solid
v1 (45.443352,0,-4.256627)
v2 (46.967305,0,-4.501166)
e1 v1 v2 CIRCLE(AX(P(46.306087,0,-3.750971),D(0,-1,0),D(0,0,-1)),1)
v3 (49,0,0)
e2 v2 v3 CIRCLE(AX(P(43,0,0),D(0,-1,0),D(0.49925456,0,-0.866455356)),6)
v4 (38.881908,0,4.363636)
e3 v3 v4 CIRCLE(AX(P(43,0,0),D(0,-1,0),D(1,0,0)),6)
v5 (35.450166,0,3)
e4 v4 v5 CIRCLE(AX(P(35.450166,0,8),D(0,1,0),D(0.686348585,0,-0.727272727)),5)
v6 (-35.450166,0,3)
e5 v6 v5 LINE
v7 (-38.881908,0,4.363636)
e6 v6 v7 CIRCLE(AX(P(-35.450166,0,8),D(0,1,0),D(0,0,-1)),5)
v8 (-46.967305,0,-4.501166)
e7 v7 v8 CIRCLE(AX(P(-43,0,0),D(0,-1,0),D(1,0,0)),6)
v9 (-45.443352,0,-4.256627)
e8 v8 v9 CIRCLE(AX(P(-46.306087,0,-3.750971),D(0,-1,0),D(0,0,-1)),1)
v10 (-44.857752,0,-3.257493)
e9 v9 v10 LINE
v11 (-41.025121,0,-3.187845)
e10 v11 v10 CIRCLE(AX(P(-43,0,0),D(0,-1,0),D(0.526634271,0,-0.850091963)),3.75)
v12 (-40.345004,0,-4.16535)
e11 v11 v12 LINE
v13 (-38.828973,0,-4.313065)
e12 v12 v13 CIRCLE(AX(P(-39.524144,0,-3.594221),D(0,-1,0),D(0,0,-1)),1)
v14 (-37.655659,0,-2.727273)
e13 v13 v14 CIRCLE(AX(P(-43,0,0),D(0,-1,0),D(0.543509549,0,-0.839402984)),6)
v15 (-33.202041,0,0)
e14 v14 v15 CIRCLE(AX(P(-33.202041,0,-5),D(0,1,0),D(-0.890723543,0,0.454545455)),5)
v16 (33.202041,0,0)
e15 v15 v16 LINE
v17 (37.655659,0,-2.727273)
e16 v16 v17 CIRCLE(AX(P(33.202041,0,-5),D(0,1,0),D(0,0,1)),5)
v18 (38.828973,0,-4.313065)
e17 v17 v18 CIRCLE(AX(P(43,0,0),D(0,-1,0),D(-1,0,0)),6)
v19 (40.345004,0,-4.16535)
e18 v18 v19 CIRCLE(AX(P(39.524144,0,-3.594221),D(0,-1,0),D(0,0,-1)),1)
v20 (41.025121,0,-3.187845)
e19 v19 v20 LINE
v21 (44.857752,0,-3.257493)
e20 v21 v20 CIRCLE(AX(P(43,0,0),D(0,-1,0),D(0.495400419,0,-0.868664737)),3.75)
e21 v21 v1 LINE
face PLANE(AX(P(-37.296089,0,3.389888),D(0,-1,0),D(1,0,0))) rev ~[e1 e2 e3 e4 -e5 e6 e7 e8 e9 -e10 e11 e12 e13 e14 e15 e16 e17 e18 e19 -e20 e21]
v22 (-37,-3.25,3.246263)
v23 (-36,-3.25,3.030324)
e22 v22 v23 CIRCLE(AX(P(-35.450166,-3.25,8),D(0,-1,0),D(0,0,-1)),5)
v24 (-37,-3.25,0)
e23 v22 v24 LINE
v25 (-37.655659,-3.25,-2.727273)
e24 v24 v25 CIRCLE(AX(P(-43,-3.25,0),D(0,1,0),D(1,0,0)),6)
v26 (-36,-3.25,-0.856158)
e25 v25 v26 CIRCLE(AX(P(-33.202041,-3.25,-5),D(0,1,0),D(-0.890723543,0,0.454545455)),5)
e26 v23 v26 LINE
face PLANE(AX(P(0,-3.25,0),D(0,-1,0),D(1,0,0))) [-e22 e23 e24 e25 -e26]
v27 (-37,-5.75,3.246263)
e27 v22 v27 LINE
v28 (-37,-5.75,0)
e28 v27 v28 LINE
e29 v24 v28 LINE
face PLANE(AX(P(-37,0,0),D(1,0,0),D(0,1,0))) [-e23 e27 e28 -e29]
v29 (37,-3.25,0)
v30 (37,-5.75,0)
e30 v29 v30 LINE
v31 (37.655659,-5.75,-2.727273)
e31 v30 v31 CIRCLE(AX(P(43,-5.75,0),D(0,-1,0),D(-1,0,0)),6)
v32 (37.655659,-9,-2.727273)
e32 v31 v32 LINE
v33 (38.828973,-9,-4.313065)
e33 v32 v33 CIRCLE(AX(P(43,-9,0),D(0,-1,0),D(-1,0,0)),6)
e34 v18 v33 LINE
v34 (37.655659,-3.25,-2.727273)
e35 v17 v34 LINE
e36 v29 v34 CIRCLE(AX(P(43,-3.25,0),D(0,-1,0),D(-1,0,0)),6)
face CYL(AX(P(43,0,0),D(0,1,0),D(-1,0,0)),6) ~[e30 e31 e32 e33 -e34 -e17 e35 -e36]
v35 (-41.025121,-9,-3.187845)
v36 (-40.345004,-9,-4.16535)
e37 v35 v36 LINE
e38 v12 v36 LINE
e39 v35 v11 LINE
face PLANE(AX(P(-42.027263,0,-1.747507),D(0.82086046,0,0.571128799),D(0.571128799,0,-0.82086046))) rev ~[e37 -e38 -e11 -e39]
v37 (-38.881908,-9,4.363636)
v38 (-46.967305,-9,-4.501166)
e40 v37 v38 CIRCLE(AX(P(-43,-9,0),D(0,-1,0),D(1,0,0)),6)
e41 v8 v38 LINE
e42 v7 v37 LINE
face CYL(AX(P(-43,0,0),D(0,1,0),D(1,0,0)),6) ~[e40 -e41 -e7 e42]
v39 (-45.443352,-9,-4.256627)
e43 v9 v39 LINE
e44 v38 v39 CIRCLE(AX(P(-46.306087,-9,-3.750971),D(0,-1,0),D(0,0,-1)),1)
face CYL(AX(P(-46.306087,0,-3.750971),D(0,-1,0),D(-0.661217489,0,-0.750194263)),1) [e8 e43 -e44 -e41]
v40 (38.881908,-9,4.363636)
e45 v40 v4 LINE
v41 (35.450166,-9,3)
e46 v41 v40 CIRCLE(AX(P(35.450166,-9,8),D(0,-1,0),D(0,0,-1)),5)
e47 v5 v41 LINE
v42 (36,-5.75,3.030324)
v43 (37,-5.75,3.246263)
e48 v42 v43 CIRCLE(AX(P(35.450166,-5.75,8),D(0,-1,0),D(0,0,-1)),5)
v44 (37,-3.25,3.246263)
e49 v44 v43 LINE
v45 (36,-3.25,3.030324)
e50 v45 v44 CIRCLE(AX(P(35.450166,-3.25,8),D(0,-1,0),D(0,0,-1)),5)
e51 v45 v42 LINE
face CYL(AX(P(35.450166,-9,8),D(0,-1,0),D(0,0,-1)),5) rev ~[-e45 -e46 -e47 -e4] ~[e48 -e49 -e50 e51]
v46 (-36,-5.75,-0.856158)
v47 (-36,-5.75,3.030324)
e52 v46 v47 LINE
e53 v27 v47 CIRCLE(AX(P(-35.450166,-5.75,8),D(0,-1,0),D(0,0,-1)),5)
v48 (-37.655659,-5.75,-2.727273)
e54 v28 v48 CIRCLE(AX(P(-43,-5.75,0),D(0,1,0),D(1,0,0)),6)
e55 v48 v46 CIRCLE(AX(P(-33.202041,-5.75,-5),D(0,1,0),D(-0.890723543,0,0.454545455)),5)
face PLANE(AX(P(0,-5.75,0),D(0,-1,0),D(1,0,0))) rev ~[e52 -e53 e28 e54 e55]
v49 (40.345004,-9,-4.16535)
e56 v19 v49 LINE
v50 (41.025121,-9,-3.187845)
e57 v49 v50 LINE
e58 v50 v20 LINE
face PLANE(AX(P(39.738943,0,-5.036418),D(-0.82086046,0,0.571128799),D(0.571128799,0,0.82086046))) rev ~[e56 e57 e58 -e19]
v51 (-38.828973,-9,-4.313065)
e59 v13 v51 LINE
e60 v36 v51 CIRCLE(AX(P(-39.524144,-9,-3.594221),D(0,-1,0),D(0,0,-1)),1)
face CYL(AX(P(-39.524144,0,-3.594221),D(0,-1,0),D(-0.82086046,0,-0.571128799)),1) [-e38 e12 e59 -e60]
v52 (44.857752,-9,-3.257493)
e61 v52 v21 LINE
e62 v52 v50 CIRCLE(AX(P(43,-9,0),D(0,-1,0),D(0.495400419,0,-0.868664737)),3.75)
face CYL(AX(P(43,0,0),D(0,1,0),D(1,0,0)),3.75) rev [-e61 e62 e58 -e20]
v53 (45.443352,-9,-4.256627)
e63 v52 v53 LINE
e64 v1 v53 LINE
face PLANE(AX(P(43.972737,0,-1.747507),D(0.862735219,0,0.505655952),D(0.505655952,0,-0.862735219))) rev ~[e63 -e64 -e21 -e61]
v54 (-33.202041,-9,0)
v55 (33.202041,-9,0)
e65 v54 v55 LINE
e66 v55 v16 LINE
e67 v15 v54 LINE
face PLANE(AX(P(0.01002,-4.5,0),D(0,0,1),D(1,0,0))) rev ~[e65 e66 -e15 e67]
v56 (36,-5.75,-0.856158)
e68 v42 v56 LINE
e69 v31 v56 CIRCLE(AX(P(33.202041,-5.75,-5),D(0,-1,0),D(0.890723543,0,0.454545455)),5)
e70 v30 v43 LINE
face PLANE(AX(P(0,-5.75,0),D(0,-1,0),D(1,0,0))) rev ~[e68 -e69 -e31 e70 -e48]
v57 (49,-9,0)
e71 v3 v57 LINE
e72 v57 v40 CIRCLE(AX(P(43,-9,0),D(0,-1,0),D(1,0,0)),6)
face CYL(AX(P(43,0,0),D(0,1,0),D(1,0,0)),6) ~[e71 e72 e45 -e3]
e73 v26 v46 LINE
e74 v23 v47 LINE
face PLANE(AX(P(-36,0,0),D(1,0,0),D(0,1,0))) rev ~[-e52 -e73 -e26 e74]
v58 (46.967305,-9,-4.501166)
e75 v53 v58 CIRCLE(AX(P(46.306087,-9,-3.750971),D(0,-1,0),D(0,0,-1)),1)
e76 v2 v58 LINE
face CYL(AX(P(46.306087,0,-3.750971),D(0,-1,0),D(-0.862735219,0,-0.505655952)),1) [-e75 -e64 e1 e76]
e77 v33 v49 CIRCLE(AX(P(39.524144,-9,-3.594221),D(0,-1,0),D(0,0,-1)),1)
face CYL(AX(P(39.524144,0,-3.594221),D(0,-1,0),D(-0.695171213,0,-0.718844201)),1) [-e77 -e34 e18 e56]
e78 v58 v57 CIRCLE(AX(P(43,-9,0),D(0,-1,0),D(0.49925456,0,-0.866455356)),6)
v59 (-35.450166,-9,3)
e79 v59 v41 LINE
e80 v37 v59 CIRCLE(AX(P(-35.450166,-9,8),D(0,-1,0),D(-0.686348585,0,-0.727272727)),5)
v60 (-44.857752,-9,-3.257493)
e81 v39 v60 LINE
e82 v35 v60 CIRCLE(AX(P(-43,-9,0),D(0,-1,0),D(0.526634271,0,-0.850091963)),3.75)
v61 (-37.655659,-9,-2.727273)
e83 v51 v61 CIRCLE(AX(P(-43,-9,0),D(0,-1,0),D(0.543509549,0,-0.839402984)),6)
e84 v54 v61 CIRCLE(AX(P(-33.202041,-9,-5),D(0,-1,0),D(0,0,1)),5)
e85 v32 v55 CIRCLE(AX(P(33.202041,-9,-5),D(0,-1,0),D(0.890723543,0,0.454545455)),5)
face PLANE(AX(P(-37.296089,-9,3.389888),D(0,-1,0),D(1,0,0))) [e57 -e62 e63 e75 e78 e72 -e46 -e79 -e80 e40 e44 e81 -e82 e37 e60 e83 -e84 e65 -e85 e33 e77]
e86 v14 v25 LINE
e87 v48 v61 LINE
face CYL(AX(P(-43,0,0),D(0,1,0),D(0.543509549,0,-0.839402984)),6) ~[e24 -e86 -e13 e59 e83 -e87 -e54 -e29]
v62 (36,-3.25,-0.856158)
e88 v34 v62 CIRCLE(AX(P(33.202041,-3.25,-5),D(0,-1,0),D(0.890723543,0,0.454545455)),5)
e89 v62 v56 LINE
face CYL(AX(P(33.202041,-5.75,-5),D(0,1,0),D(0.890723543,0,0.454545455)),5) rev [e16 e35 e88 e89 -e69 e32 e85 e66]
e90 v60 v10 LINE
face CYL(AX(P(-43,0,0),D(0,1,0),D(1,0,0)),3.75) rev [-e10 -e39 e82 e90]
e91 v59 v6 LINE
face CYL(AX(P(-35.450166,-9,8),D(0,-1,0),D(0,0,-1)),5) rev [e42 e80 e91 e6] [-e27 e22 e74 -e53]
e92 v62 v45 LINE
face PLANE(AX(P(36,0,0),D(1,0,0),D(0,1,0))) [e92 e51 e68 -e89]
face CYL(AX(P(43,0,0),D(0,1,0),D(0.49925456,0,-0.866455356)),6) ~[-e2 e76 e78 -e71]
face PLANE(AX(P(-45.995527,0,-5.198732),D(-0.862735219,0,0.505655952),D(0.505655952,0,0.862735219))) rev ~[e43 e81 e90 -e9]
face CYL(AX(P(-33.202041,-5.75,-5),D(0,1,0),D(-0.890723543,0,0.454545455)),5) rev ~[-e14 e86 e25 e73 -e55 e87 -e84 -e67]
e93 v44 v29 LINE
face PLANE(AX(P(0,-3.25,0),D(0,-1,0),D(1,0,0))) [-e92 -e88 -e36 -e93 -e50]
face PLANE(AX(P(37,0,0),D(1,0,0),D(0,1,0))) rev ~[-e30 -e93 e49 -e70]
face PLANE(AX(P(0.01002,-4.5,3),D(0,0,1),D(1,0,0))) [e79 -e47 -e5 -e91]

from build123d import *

# Parameters (mm, degrees)
F1_DEPTH      = 9
F2_R          = 1
F2_2_R        = 1
F3_W          = 86
F3_H          = 9
F4_DEPTH      = 3
F7_R          = 2
F8_DEPTH      = 25
F9_W          = 1
F9_H          = 2.5
F10_DEPTH     = 25
F11_R         = 3.75
F12_DEPTH     = 25
F13_T1_DEPTH  = 3.25
F13_T3_DEPTH  = 3.25
F13_T8_DEPTH  = 14.8842050314
F13_T13_DEPTH = 9
F13_T18_DEPTH = 9
F13_T23_DEPTH = 14.8842050314
F13_T28_DEPTH = 14.8842050314
F13_T33_DEPTH = 9
F13_T38_DEPTH = 9
F13_T43_DEPTH = 14.8842050314
F13_T48_DEPTH = 22.2397948557
F13_T54_DEPTH = 12.7448974278
F13_T60_DEPTH = 22.2397948557
F13_T66_DEPTH = 12.7448974278
F13_T72_DEPTH = 22.2397948557
F13_T78_DEPTH = 12.7448974278
F13_T84_DEPTH = 22.2397948557
F13_T90_DEPTH = 12.7448974278


# Not quite as in the source:
# - a fillet or chamfer that OpenCascade refuses, or shapes differently, is made with other operations: its cross-section is extruded or revolved along the edge and cut away or added
# - a feature names something its author has since deleted; it is built from what else it names


with BuildPart() as f1:
    # F0 (on Front) → F1 (new body)
    with BuildSketch(Plane.XZ):
        with BuildLine():
            ThreePointArc((-43.9727372119, -1.7475074582), (-44.0135397319, 1.7241627568), (-41, 0))
            Line((-41, 0), (-37, 0))
            ThreePointArc((-37, 0), (-46.0022354873, 5.1948611222), (-45.9955273596, -5.1987321375))
            Line((-45.9955273596, -5.1987321375), (-43.9727372119, -1.7475074582))
        make_face()
        with BuildLine():
            Line((-37, 0), (-41, 0))
            ThreePointArc((-41, 0), (-41.2758372432, -1.0135397319), (-42.0272627881, -1.7475074582))
            Line((-42.0272627881, -1.7475074582), (-39.7389427056, -5.0364179059))
            ThreePointArc((-39.7389427056, -5.0364179059), (-37.7290255281, -2.8665010233), (-37, 0))
        make_face()
    extrude(amount=F1_DEPTH)

    # F2
    f2_edges = [f1.edges().sort_by_distance(p)[0] for p in [
        (-42.027263, -4.5, -1.747507),
        (-43.972737, -4.5, -1.747507),
        (-39.738943, -4.5, -5.036418),
        (-45.995527, -4.5, -5.198732),
    ]]
    fillet(f2_edges, radius=F2_R)



with BuildPart() as f1b:
    # F0 (on Front) → F1, piece 2 (new body)
    with BuildSketch(Plane.XZ):
        with BuildLine():
            Line((41, 0), (37, 0))
            ThreePointArc((37, 0), (37.7290255281, -2.8665010233), (39.7389427056, -5.0364179059))
            Line((39.7389427056, -5.0364179059), (42.0272627881, -1.7475074582))
            ThreePointArc((42.0272627881, -1.7475074582), (41.2758372432, -1.0135397319), (41, 0))
        make_face()
        with BuildLine():
            ThreePointArc((49, 0), (43, 6), (37, 0))
            Line((37, 0), (41, 0))
            ThreePointArc((41, 0), (43, 2), (45, 0))
            ThreePointArc((45, 0), (44.7241627568, -1.0135397319), (43.9727372119, -1.7475074582))
            Line((43.9727372119, -1.7475074582), (45.9955273596, -5.1987321375))
            ThreePointArc((45.9955273596, -5.1987321375), (48.1948611222, -3.0022354873), (49, 0))
        make_face()
    extrude(amount=F1_DEPTH)

    # F2#2
    f2_2_edges = [f1b.edges().sort_by_distance(p)[0] for p in [
        (42.027263, -4.5, -1.747507),
        (43.972737, -4.5, -1.747507),
        (39.738943, -4.5, -5.036418),
        (45.995527, -4.5, -5.198732),
    ]]
    fillet(f2_2_edges, radius=F2_2_R)


with BuildPart() as f1_1:
    add(f1.part)

    add(f1b.part)  # F4 merges F1b
    # F3 (on Top) → F4 (join)
    with BuildSketch(Plane.XY):
        with Locations((0.0100198983, -4.5)):
            Rectangle(F3_W, F3_H)
    extrude(amount=F4_DEPTH)

    # F5: union 

    # F6: union 

    # F7 (on Front) → F8 (cut)
    with BuildSketch(Plane.XZ):
        with Locations((-43.0078394711, 0)):
            Circle(F7_R)
        with Locations((42.9660789669, 0)):
            Circle(F7_R)
    extrude(amount=F8_DEPTH, mode=Mode.SUBTRACT)

    # F9 (on face) → F10 (cut)
    with BuildSketch(Plane(origin=(0, 0, 0), x_dir=(1, 0, 0), z_dir=(0, 0, -1))):
        with Locations((36.5, 4.5)):
            Rectangle(F9_W, F9_H)
        with Locations((-36.5, 4.5)):
            Rectangle(F9_W, F9_H)
    extrude(amount=-F10_DEPTH, mode=Mode.SUBTRACT)

    # F11 (on Front) → F12 (cut)
    with BuildSketch(Plane.XZ):
        with Locations((-43, 0)):
            Circle(F11_R)
        with Locations((43, 0)):
            Circle(F11_R)
    extrude(amount=F12_DEPTH, mode=Mode.SUBTRACT)

    # F13: fillet of radius 5 on 6 edges, made by hand

    # F13_s2 → F13_t1 (join)
    with BuildSketch(Plane.XZ.offset(5.75)):
        with BuildLine():
            ThreePointArc((-37.655658743, -2.7272727273), (-35.8132058682, -0.7359856729), (-33.2020410289, 0))
            Line((-33.2020410289, 0), (-37, 0))
            ThreePointArc((-37, 0), (-37.1662170274, -1.4024892973), (-37.655658743, -2.7272727273))
        make_face()
        with BuildLine():
            ThreePointArc((37.655658743, -2.7272727273), (35.8132058682, -0.7359856729), (33.2020410289, 0))
            Line((33.2020410289, 0), (37, 0))
            ThreePointArc((37, 0), (37.1662170274, -1.4024892973), (37.655658743, -2.7272727273))
        make_face()
    extrude(amount=F13_T1_DEPTH)

    # F13_s4 → F13_t3 (join)
    with BuildSketch(Plane.XZ):
        with BuildLine():
            ThreePointArc((37.655658743, -2.7272727273), (35.8132058682, -0.7359856729), (33.2020410289, 0))
            Line((33.2020410289, 0), (37, 0))
            ThreePointArc((37, 0), (37.1662170274, -1.4024892973), (37.655658743, -2.7272727273))
        make_face()
        with BuildLine():
            ThreePointArc((-37.655658743, -2.7272727273), (-35.8132058682, -0.7359856729), (-33.2020410289, 0))
            Line((-33.2020410289, 0), (-37, 0))
            ThreePointArc((-37, 0), (-37.1662170274, -1.4024892973), (-37.655658743, -2.7272727273))
        make_face()
    extrude(amount=F13_T3_DEPTH)


with BuildPart() as f13_tool6:
    # F13_s7 → F13_t8 (new body)
    with BuildSketch(Plane.XZ.offset(9)):
        with BuildLine():
            ThreePointArc((35.4501655647, 3), (37.2965379294, 3.3533981136), (38.8819084899, 4.3636363636))
            ThreePointArc((38.8819084899, 4.3636363636), (38.2932324209, 3.7210669111), (37.8038475773, 3))
            Line((37.8038475773, 3), (35.4501655647, 3))
        make_face()
    extrude(amount=-F13_T8_DEPTH)

    split(bisect_by=Plane.XZ.offset(5.75), keep=Keep.TOP)


with BuildPart() as f1_2:
    add(f1_1.part)

    # F13_t5: union F13_tool6
    add(f13_tool6.part)


with BuildPart() as f13_tool11:
    # F13_s12 → F13_t13 (new body)
    with BuildSketch(Plane.XZ.offset(9)):
        with BuildLine():
            ThreePointArc((35.4501655647, 3), (37.2965379294, 3.3533981136), (38.8819084899, 4.3636363636))
            ThreePointArc((38.8819084899, 4.3636363636), (38.2932324209, 3.7210669111), (37.8038475773, 3))
            Line((37.8038475773, 3), (35.4501655647, 3))
        make_face()
    extrude(amount=-F13_T13_DEPTH)

    split(bisect_by=Plane.YZ.offset(36), keep=Keep.BOTTOM)


with BuildPart() as f1_3:
    add(f1_2.part)

    # F13_t10: union F13_tool11
    add(f13_tool11.part)


with BuildPart() as f13_tool16:
    # F13_s17 → F13_t18 (new body)
    with BuildSketch(Plane.XZ.offset(9)):
        with BuildLine():
            ThreePointArc((35.4501655647, 3), (37.2965379294, 3.3533981136), (38.8819084899, 4.3636363636))
            ThreePointArc((38.8819084899, 4.3636363636), (38.2932324209, 3.7210669111), (37.8038475773, 3))
            Line((37.8038475773, 3), (35.4501655647, 3))
        make_face()
    extrude(amount=-F13_T18_DEPTH)

    split(bisect_by=Plane.YZ.offset(37), keep=Keep.TOP)


with BuildPart() as f1_4:
    add(f1_3.part)

    # F13_t15: union F13_tool16
    add(f13_tool16.part)


with BuildPart() as f13_tool21:
    # F13_s22 → F13_t23 (new body)
    with BuildSketch(Plane.XZ.offset(14.8842050314)):
        with BuildLine():
            ThreePointArc((35.4501655647, 3), (37.2965379294, 3.3533981136), (38.8819084899, 4.3636363636))
            ThreePointArc((38.8819084899, 4.3636363636), (38.2932324209, 3.7210669111), (37.8038475773, 3))
            Line((37.8038475773, 3), (35.4501655647, 3))
        make_face()
    extrude(amount=-F13_T23_DEPTH)

    split(bisect_by=Plane.XZ.offset(3.25), keep=Keep.BOTTOM)


with BuildPart() as f1_5:
    add(f1_4.part)

    # F13_t20: union F13_tool21
    add(f13_tool21.part)


with BuildPart() as f13_tool26:
    # F13_s27 → F13_t28 (new body)
    with BuildSketch(Plane.XZ.offset(9)):
        with BuildLine():
            ThreePointArc((-35.4501655647, 3), (-37.2965379294, 3.3533981136), (-38.8819084899, 4.3636363636))
            ThreePointArc((-38.8819084899, 4.3636363636), (-38.2932324209, 3.7210669111), (-37.8038475773, 3))
            Line((-37.8038475773, 3), (-35.4501655647, 3))
        make_face()
    extrude(amount=-F13_T28_DEPTH)

    split(bisect_by=Plane.XZ.offset(5.75), keep=Keep.TOP)


with BuildPart() as f1_6:
    add(f1_5.part)

    # F13_t25: union F13_tool26
    add(f13_tool26.part)


with BuildPart() as f13_tool31:
    # F13_s32 → F13_t33 (new body)
    with BuildSketch(Plane.XZ.offset(9)):
        with BuildLine():
            ThreePointArc((-35.4501655647, 3), (-37.2965379294, 3.3533981136), (-38.8819084899, 4.3636363636))
            ThreePointArc((-38.8819084899, 4.3636363636), (-38.2932324209, 3.7210669111), (-37.8038475773, 3))
            Line((-37.8038475773, 3), (-35.4501655647, 3))
        make_face()
    extrude(amount=-F13_T33_DEPTH)

    split(bisect_by=Plane.YZ.offset(-36), keep=Keep.TOP)


with BuildPart() as f1_7:
    add(f1_6.part)

    # F13_t30: union F13_tool31
    add(f13_tool31.part)


with BuildPart() as f13_tool36:
    # F13_s37 → F13_t38 (new body)
    with BuildSketch(Plane.XZ.offset(9)):
        with BuildLine():
            ThreePointArc((-35.4501655647, 3), (-37.2965379294, 3.3533981136), (-38.8819084899, 4.3636363636))
            ThreePointArc((-38.8819084899, 4.3636363636), (-38.2932324209, 3.7210669111), (-37.8038475773, 3))
            Line((-37.8038475773, 3), (-35.4501655647, 3))
        make_face()
    extrude(amount=-F13_T38_DEPTH)

    split(bisect_by=Plane.YZ.offset(-37), keep=Keep.BOTTOM)


with BuildPart() as f1_8:
    add(f1_7.part)

    # F13_t35: union F13_tool36
    add(f13_tool36.part)


with BuildPart() as f13_tool41:
    # F13_s42 → F13_t43 (new body)
    with BuildSketch(Plane.XZ.offset(14.8842050314)):
        with BuildLine():
            ThreePointArc((-35.4501655647, 3), (-37.2965379294, 3.3533981136), (-38.8819084899, 4.3636363636))
            ThreePointArc((-38.8819084899, 4.3636363636), (-38.2932324209, 3.7210669111), (-37.8038475773, 3))
            Line((-37.8038475773, 3), (-35.4501655647, 3))
        make_face()
    extrude(amount=-F13_T43_DEPTH)

    split(bisect_by=Plane.XZ.offset(3.25), keep=Keep.BOTTOM)


with BuildPart() as f1_9:
    add(f1_8.part)

    # F13_t40: union F13_tool41
    add(f13_tool41.part)


with BuildPart() as f13_tool46:
    # F13_s47 → F13_t48 (new body)
    with BuildSketch(Plane.XZ.offset(18.4948974278)):
        with BuildLine():
            ThreePointArc((-37.655658743, -2.7272727273), (-35.8132058682, -0.7359856729), (-33.2020410289, 0))
            Line((-33.2020410289, 0), (-37, 0))
            ThreePointArc((-37, 0), (-37.1662170274, -1.4024892973), (-37.655658743, -2.7272727273))
        make_face()
    extrude(amount=-F13_T48_DEPTH)

    split(bisect_by=Plane.XZ.offset(3.25), keep=Keep.BOTTOM)

    split(bisect_by=Plane.XZ, keep=Keep.TOP)


with BuildPart() as f1_10:
    add(f1_9.part)

    # F13_t45: union F13_tool46
    add(f13_tool46.part)


with BuildPart() as f13_tool52:
    # F13_s53 → F13_t54 (new body)
    with BuildSketch(Plane.XZ.offset(9)):
        with BuildLine():
            ThreePointArc((-37.655658743, -2.7272727273), (-35.8132058682, -0.7359856729), (-33.2020410289, 0))
            Line((-33.2020410289, 0), (-37, 0))
            ThreePointArc((-37, 0), (-37.1662170274, -1.4024892973), (-37.655658743, -2.7272727273))
        make_face()
    extrude(amount=-F13_T54_DEPTH)

    split(bisect_by=Plane.YZ.offset(-36), keep=Keep.TOP)

    split(bisect_by=Plane.XZ, keep=Keep.TOP)


with BuildPart() as f1_11:
    add(f1_10.part)

    # F13_t51: union F13_tool52
    add(f13_tool52.part)


with BuildPart() as f13_tool58:
    # F13_s59 → F13_t60 (new body)
    with BuildSketch(Plane.XZ.offset(18.4948974278)):
        with BuildLine():
            ThreePointArc((37.655658743, -2.7272727273), (35.8132058682, -0.7359856729), (33.2020410289, 0))
            Line((33.2020410289, 0), (37, 0))
            ThreePointArc((37, 0), (37.1662170274, -1.4024892973), (37.655658743, -2.7272727273))
        make_face()
    extrude(amount=-F13_T60_DEPTH)

    split(bisect_by=Plane.XZ.offset(3.25), keep=Keep.BOTTOM)

    split(bisect_by=Plane.XZ, keep=Keep.TOP)


with BuildPart() as f1_12:
    add(f1_11.part)

    # F13_t57: union F13_tool58
    add(f13_tool58.part)


with BuildPart() as f13_tool64:
    # F13_s65 → F13_t66 (new body)
    with BuildSketch(Plane.XZ.offset(9)):
        with BuildLine():
            ThreePointArc((37.655658743, -2.7272727273), (35.8132058682, -0.7359856729), (33.2020410289, 0))
            Line((33.2020410289, 0), (37, 0))
            ThreePointArc((37, 0), (37.1662170274, -1.4024892973), (37.655658743, -2.7272727273))
        make_face()
    extrude(amount=-F13_T66_DEPTH)

    split(bisect_by=Plane.YZ.offset(36), keep=Keep.BOTTOM)

    split(bisect_by=Plane.XZ, keep=Keep.TOP)


with BuildPart() as f1_13:
    add(f1_12.part)

    # F13_t63: union F13_tool64
    add(f13_tool64.part)


with BuildPart() as f13_tool70:
    # F13_s71 → F13_t72 (new body)
    with BuildSketch(Plane.XZ.offset(12.7448974278)):
        with BuildLine():
            ThreePointArc((37.655658743, -2.7272727273), (35.8132058682, -0.7359856729), (33.2020410289, 0))
            Line((33.2020410289, 0), (37, 0))
            ThreePointArc((37, 0), (37.1662170274, -1.4024892973), (37.655658743, -2.7272727273))
        make_face()
    extrude(amount=-F13_T72_DEPTH)

    split(bisect_by=Plane.XZ.offset(5.75), keep=Keep.TOP)

    split(bisect_by=Plane.XZ.offset(9), keep=Keep.BOTTOM)


with BuildPart() as f1_14:
    add(f1_13.part)

    # F13_t69: union F13_tool70
    add(f13_tool70.part)


with BuildPart() as f13_tool76:
    # F13_s77 → F13_t78 (new body)
    with BuildSketch(Plane.XZ.offset(12.7448974278)):
        with BuildLine():
            ThreePointArc((37.655658743, -2.7272727273), (35.8132058682, -0.7359856729), (33.2020410289, 0))
            Line((33.2020410289, 0), (37, 0))
            ThreePointArc((37, 0), (37.1662170274, -1.4024892973), (37.655658743, -2.7272727273))
        make_face()
    extrude(amount=-F13_T78_DEPTH)

    split(bisect_by=Plane.YZ.offset(36), keep=Keep.BOTTOM)

    split(bisect_by=Plane.XZ.offset(9), keep=Keep.BOTTOM)


with BuildPart() as f1_15:
    add(f1_14.part)

    # F13_t75: union F13_tool76
    add(f13_tool76.part)


with BuildPart() as f13_tool82:
    # F13_s83 → F13_t84 (new body)
    with BuildSketch(Plane.XZ.offset(12.7448974278)):
        with BuildLine():
            ThreePointArc((-37.655658743, -2.7272727273), (-35.8132058682, -0.7359856729), (-33.2020410289, 0))
            Line((-33.2020410289, 0), (-37, 0))
            ThreePointArc((-37, 0), (-37.1662170274, -1.4024892973), (-37.655658743, -2.7272727273))
        make_face()
    extrude(amount=-F13_T84_DEPTH)

    split(bisect_by=Plane.XZ.offset(5.75), keep=Keep.TOP)

    split(bisect_by=Plane.XZ.offset(9), keep=Keep.BOTTOM)


with BuildPart() as f1_16:
    add(f1_15.part)

    # F13_t81: union F13_tool82
    add(f13_tool82.part)


with BuildPart() as f13_tool88:
    # F13_s89 → F13_t90 (new body)
    with BuildSketch(Plane.XZ.offset(12.7448974278)):
        with BuildLine():
            ThreePointArc((-37.655658743, -2.7272727273), (-35.8132058682, -0.7359856729), (-33.2020410289, 0))
            Line((-33.2020410289, 0), (-37, 0))
            ThreePointArc((-37, 0), (-37.1662170274, -1.4024892973), (-37.655658743, -2.7272727273))
        make_face()
    extrude(amount=-F13_T90_DEPTH)

    split(bisect_by=Plane.YZ.offset(-36), keep=Keep.TOP)

    split(bisect_by=Plane.XZ.offset(9), keep=Keep.BOTTOM)


with BuildPart() as f1_17:
    add(f1_16.part)

    # F13_t87: union F13_tool88
    add(f13_tool88.part)


solid = f1_17.part
